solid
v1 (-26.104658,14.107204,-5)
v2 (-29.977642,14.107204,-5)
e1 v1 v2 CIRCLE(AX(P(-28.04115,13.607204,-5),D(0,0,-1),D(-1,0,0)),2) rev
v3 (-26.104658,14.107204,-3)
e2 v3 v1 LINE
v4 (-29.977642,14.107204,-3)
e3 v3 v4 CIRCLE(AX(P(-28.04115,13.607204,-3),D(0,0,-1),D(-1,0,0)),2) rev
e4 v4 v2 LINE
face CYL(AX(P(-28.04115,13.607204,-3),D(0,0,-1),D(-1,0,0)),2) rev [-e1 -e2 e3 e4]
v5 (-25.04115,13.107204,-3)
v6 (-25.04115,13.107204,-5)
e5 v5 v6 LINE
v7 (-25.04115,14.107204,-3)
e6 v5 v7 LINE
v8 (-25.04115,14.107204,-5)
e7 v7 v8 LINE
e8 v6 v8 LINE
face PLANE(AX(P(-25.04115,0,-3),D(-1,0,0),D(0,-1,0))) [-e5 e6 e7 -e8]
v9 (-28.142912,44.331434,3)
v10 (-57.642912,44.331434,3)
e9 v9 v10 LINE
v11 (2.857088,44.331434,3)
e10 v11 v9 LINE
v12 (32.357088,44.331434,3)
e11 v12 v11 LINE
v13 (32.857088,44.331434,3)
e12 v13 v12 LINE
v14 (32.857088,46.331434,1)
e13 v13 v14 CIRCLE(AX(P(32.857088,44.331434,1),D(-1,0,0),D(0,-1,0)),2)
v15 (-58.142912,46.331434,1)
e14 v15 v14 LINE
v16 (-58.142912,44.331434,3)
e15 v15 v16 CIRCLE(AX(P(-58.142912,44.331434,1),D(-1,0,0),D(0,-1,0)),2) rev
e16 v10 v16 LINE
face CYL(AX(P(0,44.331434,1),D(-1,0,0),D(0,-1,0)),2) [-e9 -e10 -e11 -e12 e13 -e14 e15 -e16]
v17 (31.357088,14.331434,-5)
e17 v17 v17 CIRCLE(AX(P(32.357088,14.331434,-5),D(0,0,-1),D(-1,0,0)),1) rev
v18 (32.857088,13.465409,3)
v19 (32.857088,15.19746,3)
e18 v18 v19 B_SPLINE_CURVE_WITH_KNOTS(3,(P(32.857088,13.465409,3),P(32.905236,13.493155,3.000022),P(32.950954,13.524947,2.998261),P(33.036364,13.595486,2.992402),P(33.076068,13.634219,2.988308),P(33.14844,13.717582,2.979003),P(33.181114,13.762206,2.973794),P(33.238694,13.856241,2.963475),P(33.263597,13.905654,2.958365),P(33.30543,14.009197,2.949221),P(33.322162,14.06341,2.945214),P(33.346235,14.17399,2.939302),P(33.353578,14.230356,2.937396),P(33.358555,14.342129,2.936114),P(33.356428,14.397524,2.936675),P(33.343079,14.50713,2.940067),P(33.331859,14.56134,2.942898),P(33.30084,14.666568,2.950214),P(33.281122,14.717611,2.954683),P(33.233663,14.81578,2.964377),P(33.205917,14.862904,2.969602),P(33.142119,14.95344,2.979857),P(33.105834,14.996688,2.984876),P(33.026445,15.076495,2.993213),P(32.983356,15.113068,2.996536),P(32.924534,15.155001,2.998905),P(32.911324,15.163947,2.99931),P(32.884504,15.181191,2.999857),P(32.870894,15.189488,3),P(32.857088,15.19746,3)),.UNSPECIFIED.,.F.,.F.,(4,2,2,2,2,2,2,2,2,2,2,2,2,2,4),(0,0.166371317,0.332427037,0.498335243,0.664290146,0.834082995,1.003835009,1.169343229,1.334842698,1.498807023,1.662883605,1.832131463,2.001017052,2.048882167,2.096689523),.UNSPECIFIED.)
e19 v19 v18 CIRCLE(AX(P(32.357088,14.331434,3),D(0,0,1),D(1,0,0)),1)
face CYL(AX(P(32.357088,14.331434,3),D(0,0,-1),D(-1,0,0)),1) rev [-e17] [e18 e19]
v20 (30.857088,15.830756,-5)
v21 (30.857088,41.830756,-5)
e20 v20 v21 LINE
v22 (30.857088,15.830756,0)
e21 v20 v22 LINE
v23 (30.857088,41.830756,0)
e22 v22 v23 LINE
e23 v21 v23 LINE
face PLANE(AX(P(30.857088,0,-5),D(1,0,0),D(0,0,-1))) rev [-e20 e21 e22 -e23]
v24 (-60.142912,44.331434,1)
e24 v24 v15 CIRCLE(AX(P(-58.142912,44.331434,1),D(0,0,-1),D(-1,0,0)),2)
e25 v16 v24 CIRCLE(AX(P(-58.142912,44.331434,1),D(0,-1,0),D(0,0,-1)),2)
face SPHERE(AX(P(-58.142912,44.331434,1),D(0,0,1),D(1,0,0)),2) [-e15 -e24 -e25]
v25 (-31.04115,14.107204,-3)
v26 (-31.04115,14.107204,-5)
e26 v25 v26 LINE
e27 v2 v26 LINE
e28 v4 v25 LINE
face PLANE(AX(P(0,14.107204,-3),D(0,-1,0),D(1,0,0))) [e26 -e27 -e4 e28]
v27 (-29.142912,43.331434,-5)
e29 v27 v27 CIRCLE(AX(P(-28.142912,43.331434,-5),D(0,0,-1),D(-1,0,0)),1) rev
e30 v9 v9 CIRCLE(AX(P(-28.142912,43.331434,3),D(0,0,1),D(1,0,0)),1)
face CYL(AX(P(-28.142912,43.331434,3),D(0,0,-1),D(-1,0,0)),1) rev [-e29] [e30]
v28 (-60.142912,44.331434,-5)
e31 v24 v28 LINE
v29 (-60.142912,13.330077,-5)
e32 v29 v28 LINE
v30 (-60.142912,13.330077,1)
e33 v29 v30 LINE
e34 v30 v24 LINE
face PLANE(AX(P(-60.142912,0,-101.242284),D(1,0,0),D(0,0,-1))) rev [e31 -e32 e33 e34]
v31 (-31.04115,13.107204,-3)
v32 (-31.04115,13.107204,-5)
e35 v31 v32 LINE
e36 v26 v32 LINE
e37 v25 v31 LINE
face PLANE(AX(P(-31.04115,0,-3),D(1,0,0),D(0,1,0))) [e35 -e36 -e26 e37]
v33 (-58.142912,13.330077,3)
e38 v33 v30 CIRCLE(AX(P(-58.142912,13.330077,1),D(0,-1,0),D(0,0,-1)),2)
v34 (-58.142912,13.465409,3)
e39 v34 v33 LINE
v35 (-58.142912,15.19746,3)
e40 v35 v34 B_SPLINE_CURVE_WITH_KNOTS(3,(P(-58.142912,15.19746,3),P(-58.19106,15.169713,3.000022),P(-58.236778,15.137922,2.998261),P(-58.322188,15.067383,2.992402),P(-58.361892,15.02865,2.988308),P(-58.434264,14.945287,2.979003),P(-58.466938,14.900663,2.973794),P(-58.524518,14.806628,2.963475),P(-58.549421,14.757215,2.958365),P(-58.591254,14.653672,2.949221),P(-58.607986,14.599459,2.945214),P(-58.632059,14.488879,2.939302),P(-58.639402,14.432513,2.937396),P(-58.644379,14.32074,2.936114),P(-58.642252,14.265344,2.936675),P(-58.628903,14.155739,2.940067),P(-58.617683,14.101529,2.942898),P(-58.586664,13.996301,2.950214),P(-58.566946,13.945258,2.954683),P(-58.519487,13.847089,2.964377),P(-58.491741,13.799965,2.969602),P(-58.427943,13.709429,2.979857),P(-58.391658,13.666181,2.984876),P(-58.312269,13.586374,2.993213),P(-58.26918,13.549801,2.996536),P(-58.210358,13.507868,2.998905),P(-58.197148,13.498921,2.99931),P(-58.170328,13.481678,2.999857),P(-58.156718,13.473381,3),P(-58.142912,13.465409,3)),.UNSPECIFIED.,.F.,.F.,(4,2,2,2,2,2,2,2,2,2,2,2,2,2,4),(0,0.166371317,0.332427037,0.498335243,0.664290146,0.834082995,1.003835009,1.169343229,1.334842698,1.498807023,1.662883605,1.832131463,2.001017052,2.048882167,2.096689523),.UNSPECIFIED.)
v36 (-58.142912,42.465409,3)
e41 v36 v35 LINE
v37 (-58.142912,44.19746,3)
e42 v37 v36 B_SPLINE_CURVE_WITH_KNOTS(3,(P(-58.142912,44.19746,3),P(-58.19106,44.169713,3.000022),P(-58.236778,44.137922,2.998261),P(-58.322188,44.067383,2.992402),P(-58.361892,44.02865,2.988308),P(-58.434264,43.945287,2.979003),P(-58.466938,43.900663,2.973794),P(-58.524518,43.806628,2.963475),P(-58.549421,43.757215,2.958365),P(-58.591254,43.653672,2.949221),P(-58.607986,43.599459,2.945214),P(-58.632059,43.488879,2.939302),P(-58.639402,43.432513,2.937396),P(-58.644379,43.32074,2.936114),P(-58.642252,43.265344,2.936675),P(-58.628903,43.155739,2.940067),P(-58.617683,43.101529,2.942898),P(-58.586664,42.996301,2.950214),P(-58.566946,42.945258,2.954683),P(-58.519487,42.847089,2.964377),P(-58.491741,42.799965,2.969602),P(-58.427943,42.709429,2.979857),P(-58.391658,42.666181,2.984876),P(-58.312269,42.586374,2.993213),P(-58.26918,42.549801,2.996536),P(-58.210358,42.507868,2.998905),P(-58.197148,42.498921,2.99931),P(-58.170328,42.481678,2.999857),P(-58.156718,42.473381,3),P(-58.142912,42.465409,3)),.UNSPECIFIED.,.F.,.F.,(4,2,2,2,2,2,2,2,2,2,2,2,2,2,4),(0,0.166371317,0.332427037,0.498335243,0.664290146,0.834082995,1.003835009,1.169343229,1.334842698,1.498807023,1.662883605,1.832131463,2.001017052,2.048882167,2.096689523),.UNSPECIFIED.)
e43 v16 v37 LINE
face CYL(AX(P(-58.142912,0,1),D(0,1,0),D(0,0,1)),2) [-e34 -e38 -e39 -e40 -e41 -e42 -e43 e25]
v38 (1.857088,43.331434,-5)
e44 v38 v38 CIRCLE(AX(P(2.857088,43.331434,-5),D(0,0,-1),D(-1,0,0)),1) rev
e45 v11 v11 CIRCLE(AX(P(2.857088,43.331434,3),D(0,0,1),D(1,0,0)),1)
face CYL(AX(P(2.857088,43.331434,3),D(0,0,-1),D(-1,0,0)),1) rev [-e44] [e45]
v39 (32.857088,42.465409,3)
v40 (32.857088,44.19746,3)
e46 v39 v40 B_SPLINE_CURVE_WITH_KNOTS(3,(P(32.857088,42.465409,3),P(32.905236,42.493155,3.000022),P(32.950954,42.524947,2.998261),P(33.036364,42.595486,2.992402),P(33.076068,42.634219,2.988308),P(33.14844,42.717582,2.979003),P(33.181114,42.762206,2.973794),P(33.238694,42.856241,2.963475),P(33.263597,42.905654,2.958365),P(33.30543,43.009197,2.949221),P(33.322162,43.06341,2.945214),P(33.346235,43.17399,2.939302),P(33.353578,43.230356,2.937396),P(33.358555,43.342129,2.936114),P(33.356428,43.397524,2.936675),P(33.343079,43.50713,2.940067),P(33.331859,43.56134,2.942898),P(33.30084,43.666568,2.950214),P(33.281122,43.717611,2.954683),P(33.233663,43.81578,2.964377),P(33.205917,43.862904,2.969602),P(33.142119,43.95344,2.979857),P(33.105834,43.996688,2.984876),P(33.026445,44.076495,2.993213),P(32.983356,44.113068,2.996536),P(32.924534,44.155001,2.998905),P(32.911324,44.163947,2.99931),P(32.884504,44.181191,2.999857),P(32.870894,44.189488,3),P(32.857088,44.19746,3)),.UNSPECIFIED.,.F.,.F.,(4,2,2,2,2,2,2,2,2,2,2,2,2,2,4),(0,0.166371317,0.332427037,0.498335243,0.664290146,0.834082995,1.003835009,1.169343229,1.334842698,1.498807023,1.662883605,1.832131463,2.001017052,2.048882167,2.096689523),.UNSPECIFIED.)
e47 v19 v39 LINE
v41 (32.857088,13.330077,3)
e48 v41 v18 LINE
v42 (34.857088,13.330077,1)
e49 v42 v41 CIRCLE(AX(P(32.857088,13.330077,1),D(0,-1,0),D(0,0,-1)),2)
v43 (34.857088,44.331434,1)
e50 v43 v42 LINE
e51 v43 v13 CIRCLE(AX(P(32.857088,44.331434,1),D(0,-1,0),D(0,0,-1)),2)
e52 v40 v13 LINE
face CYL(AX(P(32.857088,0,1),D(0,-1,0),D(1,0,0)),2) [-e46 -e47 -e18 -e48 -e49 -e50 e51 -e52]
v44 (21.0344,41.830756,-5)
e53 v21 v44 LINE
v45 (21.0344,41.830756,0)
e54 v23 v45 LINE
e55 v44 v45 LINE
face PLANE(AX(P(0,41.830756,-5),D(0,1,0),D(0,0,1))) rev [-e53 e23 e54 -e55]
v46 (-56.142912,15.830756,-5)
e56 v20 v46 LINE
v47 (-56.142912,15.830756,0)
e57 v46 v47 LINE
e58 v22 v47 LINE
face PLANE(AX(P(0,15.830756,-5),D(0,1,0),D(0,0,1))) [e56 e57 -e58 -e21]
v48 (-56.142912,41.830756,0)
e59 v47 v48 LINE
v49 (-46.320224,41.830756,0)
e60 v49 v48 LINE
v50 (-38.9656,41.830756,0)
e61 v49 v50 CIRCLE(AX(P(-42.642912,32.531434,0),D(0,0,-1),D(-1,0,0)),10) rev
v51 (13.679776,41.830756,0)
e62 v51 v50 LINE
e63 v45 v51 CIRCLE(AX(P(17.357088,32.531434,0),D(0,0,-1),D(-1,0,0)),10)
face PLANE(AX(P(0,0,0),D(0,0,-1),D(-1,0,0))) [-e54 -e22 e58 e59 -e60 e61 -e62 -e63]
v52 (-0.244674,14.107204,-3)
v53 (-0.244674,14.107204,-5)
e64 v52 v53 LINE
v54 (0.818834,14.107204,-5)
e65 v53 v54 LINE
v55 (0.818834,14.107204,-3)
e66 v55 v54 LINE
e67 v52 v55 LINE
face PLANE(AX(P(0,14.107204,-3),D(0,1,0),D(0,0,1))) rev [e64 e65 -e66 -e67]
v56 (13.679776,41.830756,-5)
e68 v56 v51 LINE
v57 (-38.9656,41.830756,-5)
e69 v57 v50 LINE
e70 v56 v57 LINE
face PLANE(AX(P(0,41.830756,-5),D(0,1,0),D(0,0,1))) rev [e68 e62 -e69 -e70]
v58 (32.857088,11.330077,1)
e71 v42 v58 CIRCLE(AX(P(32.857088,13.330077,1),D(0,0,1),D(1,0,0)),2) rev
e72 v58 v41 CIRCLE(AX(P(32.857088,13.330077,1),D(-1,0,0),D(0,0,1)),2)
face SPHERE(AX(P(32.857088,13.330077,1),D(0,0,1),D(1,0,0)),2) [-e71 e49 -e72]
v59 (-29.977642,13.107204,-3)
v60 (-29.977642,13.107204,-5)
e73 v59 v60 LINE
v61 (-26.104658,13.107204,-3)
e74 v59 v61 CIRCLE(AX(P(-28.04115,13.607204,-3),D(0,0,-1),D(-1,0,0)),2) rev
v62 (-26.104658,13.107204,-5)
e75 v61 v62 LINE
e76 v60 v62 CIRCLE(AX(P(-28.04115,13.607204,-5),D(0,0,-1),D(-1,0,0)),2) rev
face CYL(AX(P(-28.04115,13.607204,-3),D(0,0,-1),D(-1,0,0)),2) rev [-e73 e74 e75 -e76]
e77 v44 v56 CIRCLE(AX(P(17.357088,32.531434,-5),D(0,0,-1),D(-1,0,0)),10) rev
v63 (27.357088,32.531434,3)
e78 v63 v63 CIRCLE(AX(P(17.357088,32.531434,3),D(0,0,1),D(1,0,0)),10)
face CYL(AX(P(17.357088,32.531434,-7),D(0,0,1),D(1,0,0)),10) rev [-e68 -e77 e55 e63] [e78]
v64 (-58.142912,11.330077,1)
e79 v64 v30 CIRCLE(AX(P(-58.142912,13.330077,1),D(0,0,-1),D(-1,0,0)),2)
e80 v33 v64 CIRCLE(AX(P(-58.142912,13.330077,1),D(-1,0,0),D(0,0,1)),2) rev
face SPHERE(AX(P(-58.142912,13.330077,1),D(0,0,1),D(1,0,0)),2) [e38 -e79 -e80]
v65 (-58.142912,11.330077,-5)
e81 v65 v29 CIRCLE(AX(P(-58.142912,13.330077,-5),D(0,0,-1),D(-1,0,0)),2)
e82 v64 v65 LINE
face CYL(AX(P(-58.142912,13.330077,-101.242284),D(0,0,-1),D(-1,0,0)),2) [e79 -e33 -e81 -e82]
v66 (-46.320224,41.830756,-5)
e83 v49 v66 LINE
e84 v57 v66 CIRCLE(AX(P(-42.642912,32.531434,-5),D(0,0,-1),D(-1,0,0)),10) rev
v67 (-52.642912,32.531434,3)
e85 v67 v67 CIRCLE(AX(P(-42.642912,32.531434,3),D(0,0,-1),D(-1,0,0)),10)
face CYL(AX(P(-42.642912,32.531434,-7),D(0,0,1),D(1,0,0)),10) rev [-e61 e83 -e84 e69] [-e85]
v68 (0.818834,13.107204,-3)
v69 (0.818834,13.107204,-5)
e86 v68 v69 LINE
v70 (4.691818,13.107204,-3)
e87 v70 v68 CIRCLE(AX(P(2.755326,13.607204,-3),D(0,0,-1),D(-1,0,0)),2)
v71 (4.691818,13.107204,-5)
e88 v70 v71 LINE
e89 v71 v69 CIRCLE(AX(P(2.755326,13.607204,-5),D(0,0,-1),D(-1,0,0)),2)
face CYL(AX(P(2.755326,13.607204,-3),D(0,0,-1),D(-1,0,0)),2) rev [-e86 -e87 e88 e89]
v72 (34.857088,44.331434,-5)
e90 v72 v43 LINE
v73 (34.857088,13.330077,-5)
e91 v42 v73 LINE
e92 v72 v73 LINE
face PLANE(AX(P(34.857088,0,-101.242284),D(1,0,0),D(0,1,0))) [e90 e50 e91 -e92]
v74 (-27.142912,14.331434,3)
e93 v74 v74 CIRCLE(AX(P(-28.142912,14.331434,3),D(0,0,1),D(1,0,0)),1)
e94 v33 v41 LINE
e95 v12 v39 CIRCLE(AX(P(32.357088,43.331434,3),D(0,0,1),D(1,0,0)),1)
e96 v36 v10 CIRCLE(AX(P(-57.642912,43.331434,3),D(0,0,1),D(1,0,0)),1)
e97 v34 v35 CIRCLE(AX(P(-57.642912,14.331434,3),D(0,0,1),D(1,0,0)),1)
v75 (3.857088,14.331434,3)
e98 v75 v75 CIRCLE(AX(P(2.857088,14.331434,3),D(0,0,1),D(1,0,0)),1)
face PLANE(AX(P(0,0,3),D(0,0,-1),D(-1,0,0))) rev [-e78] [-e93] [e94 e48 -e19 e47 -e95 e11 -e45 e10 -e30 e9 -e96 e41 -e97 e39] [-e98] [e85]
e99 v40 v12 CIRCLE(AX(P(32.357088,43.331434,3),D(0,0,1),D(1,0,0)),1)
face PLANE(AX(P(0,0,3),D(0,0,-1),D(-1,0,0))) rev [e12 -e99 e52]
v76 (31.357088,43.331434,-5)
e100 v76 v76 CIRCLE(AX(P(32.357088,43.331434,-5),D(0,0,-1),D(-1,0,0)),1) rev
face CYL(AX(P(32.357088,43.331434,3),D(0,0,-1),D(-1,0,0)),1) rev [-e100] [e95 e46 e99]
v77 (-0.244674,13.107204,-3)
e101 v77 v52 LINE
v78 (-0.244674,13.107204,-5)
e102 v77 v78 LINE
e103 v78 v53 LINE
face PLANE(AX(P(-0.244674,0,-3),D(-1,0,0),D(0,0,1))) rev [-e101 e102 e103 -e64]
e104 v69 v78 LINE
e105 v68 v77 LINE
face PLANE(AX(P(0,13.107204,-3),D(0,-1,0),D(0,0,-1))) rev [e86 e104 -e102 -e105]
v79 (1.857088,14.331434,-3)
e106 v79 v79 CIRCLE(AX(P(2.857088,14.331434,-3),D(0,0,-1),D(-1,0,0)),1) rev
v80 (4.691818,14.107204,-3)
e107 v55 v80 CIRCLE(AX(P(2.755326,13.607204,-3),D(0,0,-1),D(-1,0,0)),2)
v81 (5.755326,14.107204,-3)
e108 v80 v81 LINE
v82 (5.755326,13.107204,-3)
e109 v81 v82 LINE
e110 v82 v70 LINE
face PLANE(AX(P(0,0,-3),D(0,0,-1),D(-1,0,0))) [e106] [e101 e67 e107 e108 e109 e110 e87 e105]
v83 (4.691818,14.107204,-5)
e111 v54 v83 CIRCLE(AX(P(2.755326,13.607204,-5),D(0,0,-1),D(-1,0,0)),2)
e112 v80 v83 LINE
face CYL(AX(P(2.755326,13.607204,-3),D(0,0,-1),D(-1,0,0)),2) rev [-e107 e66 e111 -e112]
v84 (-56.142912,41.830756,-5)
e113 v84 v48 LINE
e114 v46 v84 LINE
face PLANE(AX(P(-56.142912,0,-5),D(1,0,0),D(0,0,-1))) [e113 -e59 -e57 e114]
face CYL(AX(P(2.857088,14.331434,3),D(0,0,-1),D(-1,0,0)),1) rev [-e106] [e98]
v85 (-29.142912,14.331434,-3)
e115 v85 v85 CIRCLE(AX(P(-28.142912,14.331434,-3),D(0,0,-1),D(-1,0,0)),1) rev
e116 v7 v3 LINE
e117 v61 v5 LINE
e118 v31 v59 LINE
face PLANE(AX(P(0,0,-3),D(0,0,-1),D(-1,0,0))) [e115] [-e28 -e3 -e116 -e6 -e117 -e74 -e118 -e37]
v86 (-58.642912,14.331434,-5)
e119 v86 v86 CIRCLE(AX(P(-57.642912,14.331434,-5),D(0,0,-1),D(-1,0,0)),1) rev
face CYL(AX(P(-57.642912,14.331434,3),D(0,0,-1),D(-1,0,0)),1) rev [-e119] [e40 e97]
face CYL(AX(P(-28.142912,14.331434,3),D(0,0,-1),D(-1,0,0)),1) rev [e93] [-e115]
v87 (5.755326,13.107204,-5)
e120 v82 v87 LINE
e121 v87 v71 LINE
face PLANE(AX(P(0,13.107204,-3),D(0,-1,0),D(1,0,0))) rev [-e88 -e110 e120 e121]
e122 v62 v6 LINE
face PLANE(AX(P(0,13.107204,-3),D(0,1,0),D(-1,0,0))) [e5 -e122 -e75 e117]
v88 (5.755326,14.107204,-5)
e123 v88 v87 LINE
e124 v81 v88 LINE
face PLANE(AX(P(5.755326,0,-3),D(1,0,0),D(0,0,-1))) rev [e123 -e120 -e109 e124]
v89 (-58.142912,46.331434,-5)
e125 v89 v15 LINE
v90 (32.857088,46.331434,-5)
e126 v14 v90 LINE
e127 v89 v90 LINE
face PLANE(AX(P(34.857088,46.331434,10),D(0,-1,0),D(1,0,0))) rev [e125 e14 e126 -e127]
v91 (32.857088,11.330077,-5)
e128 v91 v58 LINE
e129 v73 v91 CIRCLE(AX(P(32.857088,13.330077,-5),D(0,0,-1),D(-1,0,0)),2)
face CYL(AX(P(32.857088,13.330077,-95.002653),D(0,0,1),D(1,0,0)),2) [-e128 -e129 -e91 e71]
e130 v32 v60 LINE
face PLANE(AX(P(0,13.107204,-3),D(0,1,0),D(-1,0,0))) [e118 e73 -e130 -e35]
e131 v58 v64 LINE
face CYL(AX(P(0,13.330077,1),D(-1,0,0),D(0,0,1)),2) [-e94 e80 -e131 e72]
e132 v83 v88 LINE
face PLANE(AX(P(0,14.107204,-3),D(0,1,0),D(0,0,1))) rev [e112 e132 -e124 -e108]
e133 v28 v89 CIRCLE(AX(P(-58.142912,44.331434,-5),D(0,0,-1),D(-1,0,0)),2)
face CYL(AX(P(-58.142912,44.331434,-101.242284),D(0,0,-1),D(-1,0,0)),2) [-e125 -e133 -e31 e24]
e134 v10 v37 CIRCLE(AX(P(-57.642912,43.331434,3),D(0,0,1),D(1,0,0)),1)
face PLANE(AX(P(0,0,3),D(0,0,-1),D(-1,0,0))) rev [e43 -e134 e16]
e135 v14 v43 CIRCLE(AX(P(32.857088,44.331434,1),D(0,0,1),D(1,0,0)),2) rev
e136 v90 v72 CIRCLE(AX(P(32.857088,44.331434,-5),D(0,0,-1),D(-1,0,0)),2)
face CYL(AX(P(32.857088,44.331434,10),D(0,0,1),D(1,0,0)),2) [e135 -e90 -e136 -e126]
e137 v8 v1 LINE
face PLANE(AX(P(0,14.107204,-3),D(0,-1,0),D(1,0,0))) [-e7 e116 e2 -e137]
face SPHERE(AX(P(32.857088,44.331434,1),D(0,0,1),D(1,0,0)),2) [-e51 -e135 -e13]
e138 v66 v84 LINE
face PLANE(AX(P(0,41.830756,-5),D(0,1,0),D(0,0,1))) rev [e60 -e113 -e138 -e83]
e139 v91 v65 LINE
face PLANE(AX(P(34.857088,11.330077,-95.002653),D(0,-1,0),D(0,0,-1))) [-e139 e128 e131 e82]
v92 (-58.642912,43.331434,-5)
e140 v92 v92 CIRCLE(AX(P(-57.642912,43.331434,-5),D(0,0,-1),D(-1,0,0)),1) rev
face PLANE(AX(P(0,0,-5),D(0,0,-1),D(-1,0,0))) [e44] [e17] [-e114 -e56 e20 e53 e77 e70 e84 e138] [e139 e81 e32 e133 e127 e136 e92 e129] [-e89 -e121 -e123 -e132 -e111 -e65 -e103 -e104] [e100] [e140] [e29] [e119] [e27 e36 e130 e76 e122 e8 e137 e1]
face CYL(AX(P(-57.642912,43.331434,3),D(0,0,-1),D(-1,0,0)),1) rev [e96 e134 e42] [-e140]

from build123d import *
from build123d.topology import SkipClean

# Parameters (mm, degrees)
SKETCH2_W           = 93
SKETCH2_H           = 32
SKETCH2_R           = 1
BOSS_EXTRUDE1_DEPTH = 3
SKETCH6_W           = 95
SKETCH6_H           = 35
SKETCH6_W_2         = 93
SKETCH6_H_2         = 32
BOSS_EXTRUDE2_DEPTH = 3
SKETCH8_W           = 95
SKETCH8_H           = 0.708642827
CUT_EXTRUDE6_DEPTH  = 10
SKETCH9_W           = 95
SKETCH9_H           = 0.71
BOSS_EXTRUDE3_DEPTH = 3
SKETCH10_R          = 10
CUT_EXTRUDE7_DEPTH  = 10
BOSS_EXTRUDE7_START = 5
SKETCH11_W          = 95
SKETCH11_H          = 35.001357173
SKETCH11_R          = 1
BOSS_EXTRUDE7_DEPTH = 5
FILLET1_R           = 2
FILLET2_R           = 2
CUT_EXTRUDE9_DEPTH  = 2


# Some blends are built 0.0001 mm under size
with BuildPart() as part:
    # Sketch2 → Boss-Extrude1 (new body)
    with BuildSketch(Plane.XY):
        with Locations((-12.642912006, 28.831434421)):
            Rectangle(SKETCH2_W, SKETCH2_H)
        with Locations((-57.642912006, 43.331434421)):
            Circle(SKETCH2_R, mode=Mode.SUBTRACT)
        with Locations((-57.642912006, 14.331434421)):
            Circle(SKETCH2_R, mode=Mode.SUBTRACT)
        with Locations((-28.142912006, 43.331434421)):
            Circle(SKETCH2_R, mode=Mode.SUBTRACT)
        with Locations((2.857087994, 43.331434421)):
            Circle(SKETCH2_R, mode=Mode.SUBTRACT)
        with Locations((2.857087994, 14.331434421)):
            Circle(SKETCH2_R, mode=Mode.SUBTRACT)
        with Locations((-28.142912006, 14.331434421)):
            Circle(SKETCH2_R, mode=Mode.SUBTRACT)
        with Locations((32.357087994, 14.331434421)):
            Circle(SKETCH2_R, mode=Mode.SUBTRACT)
        with Locations((32.357087994, 43.331434421)):
            Circle(SKETCH2_R, mode=Mode.SUBTRACT)
    extrude(amount=BOSS_EXTRUDE1_DEPTH)

    # Sketch6 → Boss-Extrude2 (add)
    with BuildSketch(Plane.XY.offset(3)):
        with Locations((-12.642912006, 29.540077248)):
            Rectangle(SKETCH6_W, SKETCH6_H)
        with Locations((-12.642912006, 28.831434421)):
            Rectangle(SKETCH6_W_2, SKETCH6_H_2, mode=Mode.SUBTRACT)
    extrude(amount=-BOSS_EXTRUDE2_DEPTH)

    # Sketch8 → Cut-Extrude6 (cut)
    with BuildSketch(Plane(origin=(0, 0, 0), x_dir=(-1, 0, 0), z_dir=(0, 0, -1))):
        with Locations((12.642912006, 46.685755835)):
            Rectangle(SKETCH8_W, SKETCH8_H)
    extrude(amount=-CUT_EXTRUDE6_DEPTH, mode=Mode.SUBTRACT)

    # Sketch9 → Boss-Extrude3 (add)
    with BuildSketch(Plane.XY.offset(3)):
        with Locations((-12.642912006, 11.685077248)):
            Rectangle(SKETCH9_W, SKETCH9_H)
    extrude(amount=-BOSS_EXTRUDE3_DEPTH)

    # Sketch10 → Cut-Extrude7 (cut)
    with BuildSketch(Plane.XY.offset(3)):
        with Locations((17.357087994, 32.531434421)):
            Circle(SKETCH10_R)
    cut_extrude7 = extrude(amount=-CUT_EXTRUDE7_DEPTH, mode=Mode.SUBTRACT)

    # Sketch11 → Boss-Extrude7 (add)
    with SkipClean():  # the faces are left unmerged after this step: merging them gives an invalid solid
        with BuildSketch(Plane(origin=(0, 0, 0), x_dir=(-1, 0, 0), z_dir=(0, 0, -1)).offset(BOSS_EXTRUDE7_START)):
            with Locations((12.642912006, 28.830755835)):
                Rectangle(SKETCH11_W, SKETCH11_H)
            with BuildLine():
                Line((-30.857087994, 41.830755835), (-21.034399682, 41.830755835))
                ThreePointArc((-21.034399682, 41.830755835), (-17.357087994, 42.531434421), (-13.679776305, 41.830755835))
                Line((-13.679776305, 41.830755835), (56.142912006, 41.830755835))
                Line((56.142912006, 41.830755835), (56.142912006, 15.830755835))
                Line((56.142912006, 15.830755835), (-30.857087994, 15.830755835))
                Line((-30.857087994, 15.830755835), (-30.857087994, 41.830755835))
            make_face(mode=Mode.SUBTRACT)
            with Locations((-32.357087994, 14.331434421)):
                Circle(SKETCH11_R, mode=Mode.SUBTRACT)
            with Locations((-2.857087994, 14.331434421)):
                Circle(SKETCH11_R, mode=Mode.SUBTRACT)
            with Locations((28.142912006, 14.331434421)):
                Circle(SKETCH11_R, mode=Mode.SUBTRACT)
            with Locations((-32.357087994, 43.331434421)):
                Circle(SKETCH11_R, mode=Mode.SUBTRACT)
            with Locations((28.142912006, 43.331434421)):
                Circle(SKETCH11_R, mode=Mode.SUBTRACT)
            with Locations((57.642912006, 43.331434421)):
                Circle(SKETCH11_R, mode=Mode.SUBTRACT)
            with Locations((57.642912006, 14.331434421)):
                Circle(SKETCH11_R, mode=Mode.SUBTRACT)
            with Locations((-2.857087994, 43.331434421)):
                Circle(SKETCH11_R, mode=Mode.SUBTRACT)
        extrude(amount=-BOSS_EXTRUDE7_DEPTH)

    # Fillet1
    fillet1_edges = [part.edges().sort_by_distance(p)[0] for p in [
        (-60.142912006, 46.331434421, -2.5),
        (34.857087994, 46.331434421, -2.5),
        (-12.642912006, 46.331434421, 3),
        (-12.642912006, 11.330077248, 3),
        (-60.142912006, 11.330077248, -2.5),
        (34.857087994, 11.330077248, -2.5),
    ]]
    fillet(fillet1_edges, radius=FILLET1_R - 0.0001)  # a hair under: the kernel refuses the full size

    # Fillet2
    # the kernel refuses this fillet: 2 mm, written as the material it takes off along each edge
    with BuildSketch(Plane(origin=(-58.142912006, 11.330077248, 1), x_dir=(0, 0, 1), z_dir=(1, 0, 0))) as fillet2_piece_1:
        with BuildLine():
            CenterArc((0.0001, -1.9999), 1.9999, 0, 90)
            Line((2, -1.9999), (2, 0))
            Line((2, 0), (0.0001, 0))
        make_face()
    revolve(axis=Axis((-58.142912006, 11.330077248, 1), (0, -1, 0)), revolution_arc=90, mode=Mode.SUBTRACT)
    with BuildSketch(Plane(origin=(32.857087994, 11.330077248, 1), x_dir=(1, 0, 0), z_dir=(0, 0, -1))) as fillet2_piece_2:
        with BuildLine():
            CenterArc((0.0001, -1.9999), 1.9999, 0, 90)
            Line((2, -1.9999), (2, 0))
            Line((2, 0), (0.0001, 0))
        make_face()
    revolve(axis=Axis((32.857087994, 11.330077248, 1), (0, -1, 0)), revolution_arc=90, mode=Mode.SUBTRACT)
    with BuildSketch(Plane(origin=(32.857087994, 46.331434421, 1), x_dir=(0, 0, 1), z_dir=(-1, 0, 0))) as fillet2_piece_3:
        with BuildLine():
            CenterArc((0.0001, -1.9999), 1.9999, 0, 90)
            Line((2, -1.9999), (2, 0))
            Line((2, 0), (0.0001, 0))
        make_face()
    revolve(axis=Axis((32.857087994, 46.331434421, 1), (0, 1, 0)), revolution_arc=90, mode=Mode.SUBTRACT)
    with BuildSketch(Plane(origin=(-58.142912006, 46.331434421, 1), x_dir=(-1, 0, 0), z_dir=(0, 0, -1))) as fillet2_piece_4:
        with BuildLine():
            CenterArc((0.0001, -1.9999), 1.9999, 0, 90)
            Line((2, -1.9999), (2, 0))
            Line((2, 0), (0.0001, 0))
        make_face()
    revolve(axis=Axis((-58.142912006, 46.331434421, 1), (0, 1, 0)), revolution_arc=90, mode=Mode.SUBTRACT)
    with BuildSketch(Plane(origin=(34.857087994, 11.330077248, 3), x_dir=(-1, 0, 0), z_dir=(0, 1, 0)), Plane(origin=(-60.142912006, 46.331434421, 3), x_dir=(1, 0, 0), z_dir=(0, -1, 0))) as fillet2_piece_5:
        with BuildLine():
            CenterArc((FILLET2_R, -FILLET2_R), FILLET2_R, 90, 90)
            Line((0, -FILLET2_R), (0, 0))
            Line((0, 0), (FILLET2_R, 0))
        make_face()
    extrude(amount=35.001357174, mode=Mode.SUBTRACT)

    # Mirror1: Cut-Extrude7 across plane
    add(cut_extrude7.mirror(Plane.ZY.offset(12.642912006)), mode=Mode.SUBTRACT)

    # Sketch13 → Cut-Extrude9 (cut)
    with BuildSketch(Plane(origin=(0, 0, -5), x_dir=(-1, 0, 0), z_dir=(0, 0, -1))):
        with BuildLine():
            Line((-5.755326065, 13.107203997), (-4.691817738, 13.107203997))
            ThreePointArc((-4.691817738, 13.107203997), (-2.755326065, 11.607203997), (-0.818834392, 13.107203997))
            Line((-0.818834392, 13.107203997), (0.244673935, 13.107203997))
            Line((0.244673935, 13.107203997), (0.244673935, 14.107203997))
            Line((0.244673935, 14.107203997), (-0.818834392, 14.107203997))
            ThreePointArc((-0.818834392, 14.107203997), (-2.755326065, 15.607203997), (-4.691817738, 14.107203997))
            Line((-4.691817738, 14.107203997), (-5.755326065, 14.107203997))
            Line((-5.755326065, 14.107203997), (-5.755326065, 13.107203997))
        make_face()
        with BuildLine():
            Line((25.041150078, 13.107203997), (25.041150078, 14.107203997))
            Line((25.041150078, 14.107203997), (26.104658405, 14.107203997))
            ThreePointArc((26.104658405, 14.107203997), (28.041150078, 15.607203997), (29.977641751, 14.107203997))
            Line((29.977641751, 14.107203997), (31.041150078, 14.107203997))
            Line((31.041150078, 14.107203997), (31.041150078, 13.107203997))
            Line((31.041150078, 13.107203997), (29.977641751, 13.107203997))
            ThreePointArc((29.977641751, 13.107203997), (28.041150078, 11.607203997), (26.104658405, 13.107203997))
            Line((26.104658405, 13.107203997), (25.041150078, 13.107203997))
        make_face()
    extrude(amount=-CUT_EXTRUDE9_DEPTH, mode=Mode.SUBTRACT)


solid = part.part
